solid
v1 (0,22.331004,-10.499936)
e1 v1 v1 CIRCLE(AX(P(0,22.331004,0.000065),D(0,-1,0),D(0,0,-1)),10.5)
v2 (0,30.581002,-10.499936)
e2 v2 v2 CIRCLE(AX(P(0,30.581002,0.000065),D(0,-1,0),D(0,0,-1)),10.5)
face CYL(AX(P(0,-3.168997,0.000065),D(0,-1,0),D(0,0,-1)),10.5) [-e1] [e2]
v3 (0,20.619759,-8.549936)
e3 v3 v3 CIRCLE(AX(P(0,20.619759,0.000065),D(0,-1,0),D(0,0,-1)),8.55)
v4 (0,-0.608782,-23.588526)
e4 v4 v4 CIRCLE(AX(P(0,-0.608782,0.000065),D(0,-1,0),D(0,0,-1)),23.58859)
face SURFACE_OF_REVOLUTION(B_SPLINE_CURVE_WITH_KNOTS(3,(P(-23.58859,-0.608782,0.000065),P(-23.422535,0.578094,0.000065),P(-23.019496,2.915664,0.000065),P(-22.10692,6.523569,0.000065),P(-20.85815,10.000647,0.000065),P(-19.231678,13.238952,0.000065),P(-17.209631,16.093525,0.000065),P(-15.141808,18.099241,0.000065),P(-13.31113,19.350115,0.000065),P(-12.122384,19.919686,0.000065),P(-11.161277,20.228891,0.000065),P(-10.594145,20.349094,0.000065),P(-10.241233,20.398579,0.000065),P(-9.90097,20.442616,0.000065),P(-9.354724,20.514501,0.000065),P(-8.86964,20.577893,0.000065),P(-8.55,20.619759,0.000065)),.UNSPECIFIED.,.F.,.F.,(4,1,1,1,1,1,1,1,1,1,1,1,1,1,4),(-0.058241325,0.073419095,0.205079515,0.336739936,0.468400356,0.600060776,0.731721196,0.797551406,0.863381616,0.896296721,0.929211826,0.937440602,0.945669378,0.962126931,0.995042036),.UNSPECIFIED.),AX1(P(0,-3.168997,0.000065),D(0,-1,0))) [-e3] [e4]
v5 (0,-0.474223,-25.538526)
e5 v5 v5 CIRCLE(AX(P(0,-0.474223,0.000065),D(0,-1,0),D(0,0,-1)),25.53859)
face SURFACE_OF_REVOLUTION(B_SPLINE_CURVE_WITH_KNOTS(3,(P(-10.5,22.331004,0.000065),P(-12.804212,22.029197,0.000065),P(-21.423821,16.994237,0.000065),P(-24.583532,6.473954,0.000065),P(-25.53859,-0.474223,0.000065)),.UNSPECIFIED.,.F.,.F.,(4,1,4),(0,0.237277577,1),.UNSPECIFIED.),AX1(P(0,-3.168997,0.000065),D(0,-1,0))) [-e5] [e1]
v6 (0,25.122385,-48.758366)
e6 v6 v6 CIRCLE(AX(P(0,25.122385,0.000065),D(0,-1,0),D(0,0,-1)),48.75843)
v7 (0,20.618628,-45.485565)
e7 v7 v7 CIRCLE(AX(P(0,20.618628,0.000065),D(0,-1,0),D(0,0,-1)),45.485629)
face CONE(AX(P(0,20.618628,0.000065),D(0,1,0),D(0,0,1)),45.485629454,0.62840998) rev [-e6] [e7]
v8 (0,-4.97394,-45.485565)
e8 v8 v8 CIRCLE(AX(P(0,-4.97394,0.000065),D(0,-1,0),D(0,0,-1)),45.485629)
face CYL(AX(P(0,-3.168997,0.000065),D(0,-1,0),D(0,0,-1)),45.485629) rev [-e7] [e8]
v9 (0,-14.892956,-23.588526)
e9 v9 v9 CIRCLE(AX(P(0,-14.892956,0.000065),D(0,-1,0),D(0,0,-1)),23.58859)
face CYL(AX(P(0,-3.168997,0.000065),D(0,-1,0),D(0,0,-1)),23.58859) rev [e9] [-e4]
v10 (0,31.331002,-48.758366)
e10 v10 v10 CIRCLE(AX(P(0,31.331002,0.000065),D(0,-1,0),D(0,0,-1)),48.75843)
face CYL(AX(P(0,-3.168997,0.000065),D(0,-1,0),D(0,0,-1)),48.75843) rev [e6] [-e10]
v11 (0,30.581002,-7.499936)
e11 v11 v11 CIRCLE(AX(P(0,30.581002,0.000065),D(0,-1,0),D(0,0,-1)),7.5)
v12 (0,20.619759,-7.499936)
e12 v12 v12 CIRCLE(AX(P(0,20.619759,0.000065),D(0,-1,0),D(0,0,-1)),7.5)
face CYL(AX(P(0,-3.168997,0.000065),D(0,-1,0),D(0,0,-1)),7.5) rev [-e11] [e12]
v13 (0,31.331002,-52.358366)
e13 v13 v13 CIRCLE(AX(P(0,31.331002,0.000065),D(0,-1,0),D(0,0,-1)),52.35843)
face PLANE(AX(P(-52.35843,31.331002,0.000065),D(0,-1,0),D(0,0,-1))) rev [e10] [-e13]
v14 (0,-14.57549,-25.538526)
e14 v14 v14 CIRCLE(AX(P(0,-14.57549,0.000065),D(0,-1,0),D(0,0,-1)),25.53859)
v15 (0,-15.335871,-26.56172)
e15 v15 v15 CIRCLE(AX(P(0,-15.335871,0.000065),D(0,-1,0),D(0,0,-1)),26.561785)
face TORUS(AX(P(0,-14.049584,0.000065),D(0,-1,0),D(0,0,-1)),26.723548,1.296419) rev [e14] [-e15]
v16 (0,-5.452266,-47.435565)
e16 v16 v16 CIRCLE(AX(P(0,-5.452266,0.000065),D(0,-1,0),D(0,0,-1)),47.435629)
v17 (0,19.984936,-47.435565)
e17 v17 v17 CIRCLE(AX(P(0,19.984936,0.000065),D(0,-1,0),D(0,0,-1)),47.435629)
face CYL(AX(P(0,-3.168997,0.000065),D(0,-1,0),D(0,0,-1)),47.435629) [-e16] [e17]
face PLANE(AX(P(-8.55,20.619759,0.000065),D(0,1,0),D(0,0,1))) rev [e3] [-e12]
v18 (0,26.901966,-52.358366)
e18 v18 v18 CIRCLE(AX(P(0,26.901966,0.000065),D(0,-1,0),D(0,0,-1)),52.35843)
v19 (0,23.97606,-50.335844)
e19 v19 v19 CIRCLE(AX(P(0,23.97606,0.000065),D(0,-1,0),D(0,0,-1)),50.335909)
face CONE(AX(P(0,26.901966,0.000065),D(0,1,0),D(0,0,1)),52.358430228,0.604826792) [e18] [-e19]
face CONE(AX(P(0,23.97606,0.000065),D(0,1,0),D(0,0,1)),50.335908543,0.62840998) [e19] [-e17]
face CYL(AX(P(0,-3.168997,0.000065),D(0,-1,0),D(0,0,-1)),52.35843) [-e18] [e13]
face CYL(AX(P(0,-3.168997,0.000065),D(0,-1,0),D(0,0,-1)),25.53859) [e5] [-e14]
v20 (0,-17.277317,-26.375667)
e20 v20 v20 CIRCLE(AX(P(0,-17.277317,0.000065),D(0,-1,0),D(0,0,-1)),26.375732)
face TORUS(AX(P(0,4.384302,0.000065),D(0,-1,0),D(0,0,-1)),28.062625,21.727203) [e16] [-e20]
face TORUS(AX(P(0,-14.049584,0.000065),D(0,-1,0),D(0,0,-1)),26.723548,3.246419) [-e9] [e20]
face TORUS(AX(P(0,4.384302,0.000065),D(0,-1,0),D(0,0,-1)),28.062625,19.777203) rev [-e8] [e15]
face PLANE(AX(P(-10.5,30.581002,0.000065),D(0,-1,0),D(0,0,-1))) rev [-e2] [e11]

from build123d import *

# Parameters (mm, degrees)
SCALE1_OUTLINE_W     = 7.500000391
SCALE1_OUTLINE_H     = 22.805226105
SCALE1_OUTLINE_W_2   = 13.088589984
SCALE1_OUTLINE_H_2   = 16.734119041
SCALE1_2_OUTLINE_W   = 1.95
SCALE1_2_OUTLINE_H   = 8.24999891
SCALE1_2_OUTLINE_H_2 = 1.711244051
SCALE1_2_OUTLINE_W_2 = 1.049999765
SCALE1_2_OUTLINE_H_3 = 0.134559544
SCALE1_2_OUTLINE_W_3 = 3.6
SCALE1_2_OUTLINE_H_4 = 0.749999983
SCALE1_START         = -7.737842468
SCALE1_3_OUTLINE_R   = 34.905620152
SCALE1_3_OUTLINE_R_2 = 25.53859014
SCALE1_3_OUTLINE_R_3 = 7.000000104
SCALE1_3_OUTLINE_R_4 = 5.000000261
SCALE1_3_DEPTH       = 30.737841954
SCALE1_START_2       = -0.474222564
SCALE1_4_OUTLINE_R   = 10.500000156
SCALE1_4_OUTLINE_R_2 = 7.500000391
SCALE1_4_DEPTH       = 18.570926774
SCALE1_START_3       = -0.608782108
SCALE1_5_OUTLINE_R   = 17.02572676
SCALE1_5_OUTLINE_R_2 = 15.72572676
SCALE1_5_DEPTH       = 0.134559544


with BuildPart() as part:
    # Sketch1 → Revolve1 (revolve)
    with BuildSketch(Plane.XY, mode=Mode.PRIVATE) as revolve1_sk:
        with BuildLine():
            Line((-7.000000104, 22.499999497), (-7.000000104, 17.000000224))
            add(Edge.make_bspline(
                [(-7.000000104, 17.000000224), (-8.536141304, 16.79879583), (-14.28254756, 13.442155902), (-16.389021035, 6.428633935), (-17.02572676, 1.796516154)],
                knots=[0, 0, 0, 0, 0.237277577, 1, 1, 1, 1], degree=3))
            Line((-17.02572676, 1.796516154), (-17.02572676, -7.604329067))
            ThreePointArc((-17.02572676, -7.604329067), (-17.300179846, -7.947424503), (-17.707856522, -8.111249723))
            ThreePointArc((-17.707856522, -8.111249723), (-25.040740609, -6.529098104), (-30.323752969, -1.203295518))
            Line((-30.323752969, -1.203295518), (-30.323752969, 15.858416222))
            Line((-30.323752969, 15.858416222), (-32.505620152, 18.860921314))
            Line((-32.505620152, 18.860921314), (-32.505620152, 20.047308357))
            Line((-32.505620152, 20.047308357), (-32.505620152, 22.999999486))
            Line((-32.505620152, 22.999999486), (-34.905620152, 22.999999486))
            Line((-34.905620152, 22.999999486), (-34.905620152, 20.047308357))
            Line((-34.905620152, 20.047308357), (-33.557272362, 18.09670431))
            add(Edge.make_bspline(
                [(-33.557272362, 18.09670431), (-32.912765898, 17.20978784), (-32.268259433, 16.32287137), (-31.623752969, 15.435954899)],
                knots=[0, 0, 0, 0, 0.886176486, 0.886176486, 0.886176486, 0.886176486], degree=3))
            Line((-31.623752969, 15.435954899), (-31.623752969, -1.522179518))
            ThreePointArc((-31.623752969, -1.522179518), (-25.800120471, -7.594480577), (-17.583821153, -9.405546874))
            ThreePointArc((-17.583821153, -9.405546874), (-16.40877561, -8.898313798), (-15.72572676, -7.81597296))
            Line((-15.72572676, -7.81597296), (-15.72572676, 1.706809791))
            add(Edge.make_bspline(
                [(-15.72572676, 1.706809791), (-15.615023415, 2.498060507), (-15.346330749, 4.056440245), (-14.737946403, 6.46171077), (-13.905433252, 8.779762536), (-12.821118751, 10.938632312), (-11.473087245, 12.841681257), (-10.094538345, 14.178825349), (-8.874086433, 15.012741309), (-8.081589266, 15.392455243), (-7.440851602, 15.598591787), (-7.062763612, 15.678727138), (-6.82748859, 15.711717395), (-6.600646999, 15.741074943), (-6.236482767, 15.788998756), (-5.91309335, 15.831259817), (-5.700000104, 15.859170856)],
                knots=[-0.058241325, -0.058241325, -0.058241325, -0.058241325, 0.073419095, 0.205079515, 0.336739936, 0.468400356, 0.600060776, 0.731721196, 0.797551406, 0.863381616, 0.896296721, 0.929211826, 0.937440602, 0.945669378, 0.962126931, 0.995042036, 0.995042036, 0.995042036, 0.995042036], degree=3))
            Line((-5.700000104, 15.859170856), (-5.000000261, 15.859170856))
            Line((-5.000000261, 15.859170856), (-5.000000261, 22.499999497))
            Line((-5.000000261, 22.499999497), (-7.000000104, 22.499999497))
        make_face()
    revolve(revolve1_sk.sketch.rotate(Axis((0, 0, 0), (0, 1, 0)), 270), axis=Axis((0, 0, 0), (0, 1, 0)))

    # Scale1: read off the stored shape, not the designer's step
    # Scale1 outline → Scale1 (revolve, cut)
    with BuildSketch(Plane.XY.offset(6.4582e-05)):
        with BuildLine():
            add(Edge.make_bspline(
                [(23.569600439, -0.474222564), (23.407221925, 0.666506856), (23.007993943, 2.961137879), (22.106919604, 6.52356936), (20.858149879, 10.000647009), (19.231678126, 13.238951674), (17.209630867, 16.09352509), (15.141807518, 18.099241229), (13.311129649, 19.350115169), (12.122383899, 19.919686069), (11.188458251, 20.22014633), (10.714112032, 20.323498357), (10.500000156, 20.359610991)],
                knots=[-0.053262952, -0.053262952, -0.053262952, -0.053262952, 0.073419095, 0.205079515, 0.336739936, 0.468400356, 0.600060776, 0.731721196, 0.797551406, 0.863381616, 0.896296721, 0.925488366, 0.925488366, 0.925488366, 0.925488366], degree=3))
            Line((10.500000156, 20.359610991), (10.500000156, -0.474222564))
            Line((10.500000156, -0.474222564), (23.569600439, -0.474222564))
        make_face()
        with Locations((3.750000196, 10.928390488)):
            Rectangle(SCALE1_OUTLINE_W, SCALE1_OUTLINE_H)
        with Locations((17.044295148, -8.975841628)):
            Rectangle(SCALE1_OUTLINE_W_2, SCALE1_OUTLINE_H_2)
    revolve(axis=Axis((0, 0, 6.4582e-05), (0, 1, 0)), mode=Mode.SUBTRACT)

    # Scale1 2 outline → Scale1 2 (revolve)
    with BuildSketch(Plane.XY.offset(6.4582e-05)):
        with Locations((9.525000156, 26.456002996)):
            Rectangle(SCALE1_2_OUTLINE_W, SCALE1_2_OUTLINE_H)
        with BuildLine():
            add(Edge.make_bspline(
                [(10.500000156, 22.331003541), (12.091785865, 22.122510807), (13.55998342, 21.48791389), (14.88862859, 20.61975949)],
                knots=[0, 0, 0, 0, 0.163915077, 0.163915077, 0.163915077, 0.163915077], degree=3))
            Line((10.500000156, 22.331003541), (10.500000156, 20.61975949))
            Line((10.500000156, 20.61975949), (14.88862859, 20.61975949))
        make_face()
        with Locations((9.525000156, 21.475381516)):
            Rectangle(SCALE1_2_OUTLINE_W, SCALE1_2_OUTLINE_H_2)
        with BuildLine():
            add(Edge.make_bspline(
                [(14.88862859, 20.61975949), (15.483282431, 20.231204772), (19.588815041, 17.077328651), (22.152057592, 12.373980836), (23.58859014, 8.093228858)],
                knots=[0.163915077, 0.163915077, 0.163915077, 0.163915077, 0.237277577, 0.695399718, 0.695399718, 0.695399718, 0.695399718], degree=3))
            Line((14.88862859, 20.61975949), (10.500000156, 20.61975949))
            Line((10.500000156, 20.61975949), (10.500000156, 20.359610991))
            add(Edge.make_bspline(
                [(23.569600439, -0.474222564), (23.407221925, 0.666506856), (23.007993943, 2.961137879), (22.106919604, 6.52356936), (20.858149879, 10.000647009), (19.231678126, 13.238951674), (17.209630867, 16.09352509), (15.141807518, 18.099241229), (13.311129649, 19.350115169), (12.122383899, 19.919686069), (11.188458251, 20.22014633), (10.714112032, 20.323498357), (10.500000156, 20.359610991)],
                knots=[-0.053262952, -0.053262952, -0.053262952, -0.053262952, 0.073419095, 0.205079515, 0.336739936, 0.468400356, 0.600060776, 0.731721196, 0.797551406, 0.863381616, 0.896296721, 0.925488366, 0.925488366, 0.925488366, 0.925488366], degree=3))
            Line((23.569600439, -0.474222564), (23.58859014, -0.474222564))
            Line((23.58859014, -0.474222564), (23.58859014, 8.093228858))
        make_face()
        with BuildLine():
            Line((10.500000156, 20.359610991), (10.500000156, 20.61975949))
            Line((10.500000156, 20.61975949), (8.550000156, 20.61975949))
            add(Edge.make_bspline(
                [(10.500000156, 20.359610991), (10.472689703, 20.364217239), (10.385485446, 20.378352208), (10.241232886, 20.398579298), (9.900970499, 20.44261562), (9.35472415, 20.514501339), (8.869640025, 20.577892931), (8.550000156, 20.61975949)],
                knots=[0.925488366, 0.925488366, 0.925488366, 0.925488366, 0.929211826, 0.937440602, 0.945669378, 0.962126931, 0.995042036, 0.995042036, 0.995042036, 0.995042036], degree=3))
        make_face()
        with Locations((8.025000274, 21.475381516)):
            Rectangle(SCALE1_2_OUTLINE_W_2, SCALE1_2_OUTLINE_H_2)
        with Locations((8.025000274, 26.456002996)):
            Rectangle(SCALE1_2_OUTLINE_W_2, SCALE1_2_OUTLINE_H)
        with BuildLine():
            add(Edge.make_bspline(
                [(23.58859014, 8.093228858), (24.543724546, 5.247004801), (25.157178625, 2.300596307), (25.53859014, -0.474222564)],
                knots=[0.695399718, 0.695399718, 0.695399718, 0.695399718, 1, 1, 1, 1], degree=3))
            Line((23.58859014, 8.093228858), (23.58859014, -0.474222564))
            Line((23.58859014, -0.474222564), (25.53859014, -0.474222564))
        make_face()
        with Locations((24.56359014, -0.541502336)):
            Rectangle(SCALE1_2_OUTLINE_W, SCALE1_2_OUTLINE_H_3)
        with BuildLine():
            Line((23.58859014, -0.608782108), (23.58859014, -0.474222564))
            Line((23.58859014, -0.474222564), (23.569600439, -0.474222564))
            add(Edge.make_bspline(
                [(23.58859014, -0.608782108), (23.582311232, -0.563903691), (23.575981617, -0.519051141), (23.569600439, -0.474222564)],
                knots=[-0.058241325, -0.058241325, -0.058241325, -0.058241325, -0.053262952, -0.053262952, -0.053262952, -0.053262952], degree=3))
        make_face()
        with BuildLine():
            Line((25.53859014, -14.575490395), (25.53859014, -0.608782108))
            Line((25.53859014, -0.608782108), (23.58859014, -0.608782108))
            Line((23.58859014, -0.608782108), (23.58859014, -14.892956235))
            ThreePointArc((23.58859014, -14.892956235), (24.304354673, -16.214472206), (25.53859014, -17.072018788))
            Line((25.53859014, -17.072018788), (25.53859014, -14.575490395))
        make_face()
        with Locations((46.460629454, -0.541502336)):
            Rectangle(SCALE1_2_OUTLINE_W, SCALE1_2_OUTLINE_H_3)
        Polygon((45.485629454, 20.618627539), (45.485629454, -0.474222564), (47.435629454, -0.474222564), (47.435629454, 19.984935554), (47.435629454, 20.61975949), (45.486452023, 20.61975949), align=None)
        Polygon((47.435629454, 22.331003541), (46.729982715, 22.331003541), (45.486452023, 20.61975949), (47.435629454, 20.61975949), align=None)
        Polygon((47.435629454, 23.302056199), (46.729982715, 22.331003541), (47.435629454, 22.331003541), align=None)
        with BuildLine():
            ThreePointArc((26.561784783, -15.335871378), (25.950269769, -15.09013355), (25.53859014, -14.575490395))
            Line((25.53859014, -14.575490395), (25.53859014, -17.072018788))
            ThreePointArc((25.53859014, -17.072018788), (25.950317126, -17.202574831), (26.375731729, -17.277317106))
            ThreePointArc((26.375731729, -17.277317106), (27.218541222, -17.326498868), (28.062625137, -17.342901049))
            ThreePointArc((28.062625137, -17.342901049), (37.810118465, -15.033672446), (45.485629454, -8.596849163))
            Line((45.485629454, -8.596849163), (45.485629454, -4.973940071))
            ThreePointArc((45.485629454, -4.973940071), (37.561110914, -12.96264395), (26.561784783, -15.335871378))
        make_face()
        with BuildLine():
            Line((47.435629454, -0.608782108), (45.485629454, -0.608782108))
            Line((45.485629454, -0.608782108), (45.485629454, -4.973940071))
            Line((45.485629454, -4.973940071), (45.485629454, -8.596849163))
            ThreePointArc((45.485629454, -8.596849163), (46.527691169, -7.066143526), (47.435629454, -5.452266072))
            Line((47.435629454, -5.452266072), (47.435629454, -0.608782108))
        make_face()
        Polygon((48.758430228, 25.122385177), (47.435629454, 23.302056199), (47.435629454, 22.331003541), (48.758430228, 22.331003541), align=None)
        Polygon((48.758430228, 22.331003541), (47.435629454, 22.331003541), (47.435629454, 20.61975949), (47.896944746, 20.61975949), (48.758430228, 21.805264532), align=None)
        Polygon((47.435629454, 20.61975949), (47.435629454, 19.984935554), (47.896944746, 20.61975949), align=None)
        Polygon((52.358430228, 30.581002451), (48.758430228, 30.581002451), (48.758430228, 25.122385177), (48.758430228, 22.331003541), (49.140475438, 22.331003541), (50.335908543, 23.976059671), (52.358430228, 26.901965741), align=None)
        with Locations((50.558430228, 30.956002443)):
            Rectangle(SCALE1_2_OUTLINE_W_3, SCALE1_2_OUTLINE_H_4)
        Polygon((49.140475438, 22.331003541), (48.758430228, 22.331003541), (48.758430228, 21.805264532), align=None)
    revolve(axis=Axis((0, 0, 6.4582e-05), (0, 1, 0)))

    # Scale1 3 outline → Scale1 3 (cut)
    # profile 1 of 2: a face of its own
    with BuildSketch(Plane(origin=(0, 0, 0), x_dir=(1, 0, 0), z_dir=(0, 1, 0)).offset(SCALE1_START)):
        Circle(SCALE1_3_OUTLINE_R)
        with Locations((0, -6.4582e-05)):
            Circle(SCALE1_3_OUTLINE_R_2, mode=Mode.SUBTRACT)
    # profile 2 of 2: a face of its own
    with BuildSketch(Plane(origin=(0, 0, 0), x_dir=(1, 0, 0), z_dir=(0, 1, 0)).offset(SCALE1_START)):
        Circle(SCALE1_3_OUTLINE_R_3)
        Circle(SCALE1_3_OUTLINE_R_4, mode=Mode.SUBTRACT)
    extrude(amount=SCALE1_3_DEPTH, mode=Mode.SUBTRACT)

    # Scale1 4 outline → Scale1 4 (cut)
    with BuildSketch(Plane(origin=(0, 0, 0), x_dir=(1, 0, 0), z_dir=(0, 1, 0)).offset(SCALE1_START_2)):
        with Locations((0, -6.4582e-05)):
            Circle(SCALE1_4_OUTLINE_R)
        with Locations((0, -6.4582e-05)):
            Circle(SCALE1_4_OUTLINE_R_2, mode=Mode.SUBTRACT)
    extrude(amount=SCALE1_4_DEPTH, mode=Mode.SUBTRACT)

    # Scale1 5 outline → Scale1 5 (cut)
    with BuildSketch(Plane(origin=(0, 0, 0), x_dir=(1, 0, 0), z_dir=(0, 1, 0)).offset(SCALE1_START_3)):
        Circle(SCALE1_5_OUTLINE_R)
        Circle(SCALE1_5_OUTLINE_R_2, mode=Mode.SUBTRACT)
    extrude(amount=SCALE1_5_DEPTH, mode=Mode.SUBTRACT)


solid = part.part
